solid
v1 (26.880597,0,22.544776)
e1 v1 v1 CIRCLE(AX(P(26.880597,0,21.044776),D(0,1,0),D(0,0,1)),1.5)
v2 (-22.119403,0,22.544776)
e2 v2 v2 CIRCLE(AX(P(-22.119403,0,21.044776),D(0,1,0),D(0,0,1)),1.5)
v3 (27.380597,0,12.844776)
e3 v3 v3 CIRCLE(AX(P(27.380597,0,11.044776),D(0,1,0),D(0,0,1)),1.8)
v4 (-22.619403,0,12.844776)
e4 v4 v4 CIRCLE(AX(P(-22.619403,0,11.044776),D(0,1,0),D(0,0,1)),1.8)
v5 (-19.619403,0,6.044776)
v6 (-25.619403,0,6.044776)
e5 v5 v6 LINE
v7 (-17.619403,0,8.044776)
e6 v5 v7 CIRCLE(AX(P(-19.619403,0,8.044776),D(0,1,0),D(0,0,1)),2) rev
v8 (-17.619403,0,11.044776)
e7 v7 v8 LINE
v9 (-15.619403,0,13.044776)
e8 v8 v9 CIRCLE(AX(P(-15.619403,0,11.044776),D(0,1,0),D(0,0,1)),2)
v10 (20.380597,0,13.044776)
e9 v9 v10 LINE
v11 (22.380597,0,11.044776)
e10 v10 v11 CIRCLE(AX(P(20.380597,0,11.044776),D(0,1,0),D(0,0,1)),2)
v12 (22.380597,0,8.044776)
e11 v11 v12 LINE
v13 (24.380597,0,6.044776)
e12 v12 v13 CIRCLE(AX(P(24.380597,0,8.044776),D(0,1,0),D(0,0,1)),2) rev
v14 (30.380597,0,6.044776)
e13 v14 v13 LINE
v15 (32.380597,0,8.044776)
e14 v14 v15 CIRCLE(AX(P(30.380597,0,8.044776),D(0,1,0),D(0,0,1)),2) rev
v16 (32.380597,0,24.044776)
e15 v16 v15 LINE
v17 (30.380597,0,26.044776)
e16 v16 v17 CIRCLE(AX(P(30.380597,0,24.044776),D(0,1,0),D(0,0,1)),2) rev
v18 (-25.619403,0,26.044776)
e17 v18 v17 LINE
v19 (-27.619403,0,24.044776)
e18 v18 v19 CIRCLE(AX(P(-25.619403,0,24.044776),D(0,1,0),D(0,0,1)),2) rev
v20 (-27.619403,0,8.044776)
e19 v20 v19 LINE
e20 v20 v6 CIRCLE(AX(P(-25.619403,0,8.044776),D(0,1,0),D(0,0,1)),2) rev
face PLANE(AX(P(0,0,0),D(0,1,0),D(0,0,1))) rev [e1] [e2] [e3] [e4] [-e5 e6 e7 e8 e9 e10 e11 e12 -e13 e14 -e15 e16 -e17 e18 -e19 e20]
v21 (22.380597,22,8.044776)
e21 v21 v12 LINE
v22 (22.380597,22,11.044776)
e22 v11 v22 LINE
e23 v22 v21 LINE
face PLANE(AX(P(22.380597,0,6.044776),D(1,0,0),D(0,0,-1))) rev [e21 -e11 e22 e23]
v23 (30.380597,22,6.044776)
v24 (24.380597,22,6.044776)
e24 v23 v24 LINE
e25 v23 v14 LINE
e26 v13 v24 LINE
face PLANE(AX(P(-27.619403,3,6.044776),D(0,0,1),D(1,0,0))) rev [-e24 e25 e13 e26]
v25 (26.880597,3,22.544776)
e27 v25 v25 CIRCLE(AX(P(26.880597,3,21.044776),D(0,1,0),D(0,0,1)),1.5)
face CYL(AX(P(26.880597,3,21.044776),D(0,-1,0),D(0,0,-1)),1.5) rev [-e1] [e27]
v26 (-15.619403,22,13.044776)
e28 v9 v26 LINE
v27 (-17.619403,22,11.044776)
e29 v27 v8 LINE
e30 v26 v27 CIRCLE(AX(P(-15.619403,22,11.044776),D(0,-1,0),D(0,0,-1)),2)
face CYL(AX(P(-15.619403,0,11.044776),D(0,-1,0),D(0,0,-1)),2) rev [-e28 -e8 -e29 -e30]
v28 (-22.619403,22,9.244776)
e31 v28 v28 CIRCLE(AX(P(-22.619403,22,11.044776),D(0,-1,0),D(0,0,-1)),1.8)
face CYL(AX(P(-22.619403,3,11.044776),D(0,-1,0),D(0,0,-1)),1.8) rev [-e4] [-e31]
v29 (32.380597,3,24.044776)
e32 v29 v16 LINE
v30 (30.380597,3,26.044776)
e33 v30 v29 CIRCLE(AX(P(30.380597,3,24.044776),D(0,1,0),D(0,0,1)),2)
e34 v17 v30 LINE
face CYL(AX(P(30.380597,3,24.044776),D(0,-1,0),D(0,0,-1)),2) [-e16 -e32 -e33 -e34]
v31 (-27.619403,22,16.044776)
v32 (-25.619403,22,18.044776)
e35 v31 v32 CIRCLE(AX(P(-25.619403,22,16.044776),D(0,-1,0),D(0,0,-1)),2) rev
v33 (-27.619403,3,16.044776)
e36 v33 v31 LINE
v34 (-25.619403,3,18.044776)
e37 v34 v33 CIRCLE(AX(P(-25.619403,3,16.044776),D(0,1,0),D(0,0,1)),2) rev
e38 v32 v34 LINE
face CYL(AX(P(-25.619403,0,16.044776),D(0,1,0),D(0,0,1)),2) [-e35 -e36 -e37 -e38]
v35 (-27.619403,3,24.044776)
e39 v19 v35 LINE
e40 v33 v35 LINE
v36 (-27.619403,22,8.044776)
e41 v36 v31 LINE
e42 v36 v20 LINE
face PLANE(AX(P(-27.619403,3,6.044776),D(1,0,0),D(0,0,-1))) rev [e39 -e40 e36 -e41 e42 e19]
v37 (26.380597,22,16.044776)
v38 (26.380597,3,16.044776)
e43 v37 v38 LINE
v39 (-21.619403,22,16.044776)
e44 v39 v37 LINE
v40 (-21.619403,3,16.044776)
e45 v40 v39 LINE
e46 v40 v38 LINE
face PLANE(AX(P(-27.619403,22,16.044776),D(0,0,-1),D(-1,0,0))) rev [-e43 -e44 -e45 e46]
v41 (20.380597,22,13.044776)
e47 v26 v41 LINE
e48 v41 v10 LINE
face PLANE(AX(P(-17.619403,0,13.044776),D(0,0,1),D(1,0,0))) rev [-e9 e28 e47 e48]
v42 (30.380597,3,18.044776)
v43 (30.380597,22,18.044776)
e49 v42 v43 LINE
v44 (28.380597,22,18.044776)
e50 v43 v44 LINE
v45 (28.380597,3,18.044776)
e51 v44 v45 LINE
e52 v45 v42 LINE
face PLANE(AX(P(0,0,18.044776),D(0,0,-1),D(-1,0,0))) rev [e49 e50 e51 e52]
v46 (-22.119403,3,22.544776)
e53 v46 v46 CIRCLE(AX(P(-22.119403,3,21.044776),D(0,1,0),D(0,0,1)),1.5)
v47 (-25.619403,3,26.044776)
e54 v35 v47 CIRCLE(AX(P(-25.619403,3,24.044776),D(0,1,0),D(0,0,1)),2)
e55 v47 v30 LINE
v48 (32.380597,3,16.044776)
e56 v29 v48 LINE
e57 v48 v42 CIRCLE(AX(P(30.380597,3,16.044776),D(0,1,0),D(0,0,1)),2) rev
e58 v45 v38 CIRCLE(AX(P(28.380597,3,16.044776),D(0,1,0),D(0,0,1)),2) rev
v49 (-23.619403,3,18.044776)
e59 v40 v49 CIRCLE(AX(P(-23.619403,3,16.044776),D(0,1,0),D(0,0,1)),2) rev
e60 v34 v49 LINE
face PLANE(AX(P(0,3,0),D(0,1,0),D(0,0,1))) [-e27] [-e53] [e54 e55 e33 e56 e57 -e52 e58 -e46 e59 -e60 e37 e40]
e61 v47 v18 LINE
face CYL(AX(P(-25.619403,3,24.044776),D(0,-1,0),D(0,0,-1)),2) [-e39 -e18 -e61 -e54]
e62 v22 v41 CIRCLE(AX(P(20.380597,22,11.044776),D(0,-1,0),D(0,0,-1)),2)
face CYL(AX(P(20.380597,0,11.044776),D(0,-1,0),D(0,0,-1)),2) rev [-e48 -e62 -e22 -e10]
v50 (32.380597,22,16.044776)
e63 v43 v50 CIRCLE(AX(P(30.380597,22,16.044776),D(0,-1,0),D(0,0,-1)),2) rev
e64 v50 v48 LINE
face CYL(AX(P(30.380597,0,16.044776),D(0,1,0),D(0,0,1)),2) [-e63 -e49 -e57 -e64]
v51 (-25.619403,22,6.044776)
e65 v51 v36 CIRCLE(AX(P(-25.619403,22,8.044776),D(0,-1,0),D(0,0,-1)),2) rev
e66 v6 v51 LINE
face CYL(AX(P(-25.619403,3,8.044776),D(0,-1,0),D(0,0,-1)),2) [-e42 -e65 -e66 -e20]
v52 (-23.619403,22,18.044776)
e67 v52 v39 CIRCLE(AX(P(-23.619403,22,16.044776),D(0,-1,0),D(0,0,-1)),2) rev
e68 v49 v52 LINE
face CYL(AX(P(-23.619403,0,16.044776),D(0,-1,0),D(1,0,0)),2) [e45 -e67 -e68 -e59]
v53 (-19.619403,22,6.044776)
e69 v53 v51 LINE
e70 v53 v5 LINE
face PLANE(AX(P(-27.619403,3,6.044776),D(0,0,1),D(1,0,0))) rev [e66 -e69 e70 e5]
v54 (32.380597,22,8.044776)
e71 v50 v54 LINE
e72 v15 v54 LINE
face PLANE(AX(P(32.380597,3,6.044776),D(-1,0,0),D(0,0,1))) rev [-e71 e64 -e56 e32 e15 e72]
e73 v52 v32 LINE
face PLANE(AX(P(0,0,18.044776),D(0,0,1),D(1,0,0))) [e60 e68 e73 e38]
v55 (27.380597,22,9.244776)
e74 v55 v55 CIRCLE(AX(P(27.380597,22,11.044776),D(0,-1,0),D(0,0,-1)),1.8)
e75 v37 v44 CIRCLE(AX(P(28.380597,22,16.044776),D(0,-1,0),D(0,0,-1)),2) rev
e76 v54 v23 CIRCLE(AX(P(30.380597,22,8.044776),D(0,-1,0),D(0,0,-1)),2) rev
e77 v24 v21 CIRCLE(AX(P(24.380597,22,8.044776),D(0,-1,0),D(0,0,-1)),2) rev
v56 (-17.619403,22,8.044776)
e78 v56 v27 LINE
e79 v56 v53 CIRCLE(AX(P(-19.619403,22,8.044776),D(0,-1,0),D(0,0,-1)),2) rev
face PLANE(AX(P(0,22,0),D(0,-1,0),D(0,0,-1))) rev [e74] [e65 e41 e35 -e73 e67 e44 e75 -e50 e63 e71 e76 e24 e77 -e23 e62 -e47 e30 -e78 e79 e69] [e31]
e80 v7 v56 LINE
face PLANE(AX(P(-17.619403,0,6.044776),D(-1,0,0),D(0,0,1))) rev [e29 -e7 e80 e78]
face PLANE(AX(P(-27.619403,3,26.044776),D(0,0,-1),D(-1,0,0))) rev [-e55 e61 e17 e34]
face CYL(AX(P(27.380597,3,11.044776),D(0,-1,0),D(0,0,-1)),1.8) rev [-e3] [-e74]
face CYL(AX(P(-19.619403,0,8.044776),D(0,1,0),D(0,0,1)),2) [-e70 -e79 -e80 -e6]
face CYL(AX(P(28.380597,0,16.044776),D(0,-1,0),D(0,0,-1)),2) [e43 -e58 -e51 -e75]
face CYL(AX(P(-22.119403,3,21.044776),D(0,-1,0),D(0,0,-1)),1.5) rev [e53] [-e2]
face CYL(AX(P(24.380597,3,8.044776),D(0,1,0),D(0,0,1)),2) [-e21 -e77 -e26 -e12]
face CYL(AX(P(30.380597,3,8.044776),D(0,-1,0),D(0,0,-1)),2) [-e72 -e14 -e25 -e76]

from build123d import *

# Parameters (mm, degrees)
SKETCH_1_W          = 60
SKETCH_1_H          = 20
SKETCH_1_R          = 1.5
SKETCH_1_R_2        = 1.8
EXTRUDE_1_DEPTH     = 3
SKETCH_7_W          = 60
SKETCH_7_H          = 10
EXTRUDE_3_DEPTH     = 19
SKETCH_8_R          = 1.8
CUT_EXTRUDE_3_DEPTH = 46.692815914
SKETCH_9_W          = 6
SKETCH_9_H          = 19
EXTRUDE_4_DEPTH     = 2
SKETCH_10_W         = 40
SKETCH_10_H         = 7
CUT_EXTRUDE_4_DEPTH = 48.019500488
FILLET_2_R          = 2


with BuildPart() as part:
    # ｽｹｯﾁ1 → ﾎﾞｽ - 押し出し1 (new body)
    with BuildSketch(Plane(origin=(0, 0, 0), x_dir=(1, 0, 0), z_dir=(0, 1, 0))):
        with Locations((2.380597015, -16.044776119)):
            Rectangle(SKETCH_1_W, SKETCH_1_H)
        with Locations(Location((-22.119402985, -21.044776119, 0), (0, 0, 270))):
            Circle(SKETCH_1_R, mode=Mode.SUBTRACT)
        with Locations(Location((26.880597015, -21.044776119, 0), (0, 0, 270))):
            Circle(SKETCH_1_R, mode=Mode.SUBTRACT)
        with Locations(Location((-22.619402985, -11.044776119, 0), (0, 0, 270))):
            Circle(SKETCH_1_R_2, mode=Mode.SUBTRACT)
        with Locations(Location((27.380597015, -11.044776119, 0), (0, 0, 270))):
            Circle(SKETCH_1_R_2, mode=Mode.SUBTRACT)
    extrude(amount=EXTRUDE_1_DEPTH)

    # ｽｹｯﾁ7 → ﾎﾞｽ - 押し出し3 (add)
    with BuildSketch(Plane(origin=(0, 3, 0), x_dir=(1, 0, 0), z_dir=(0, 1, 0))):
        with Locations((2.380597015, -11.044776119)):
            Rectangle(SKETCH_7_W, SKETCH_7_H)
    extrude(amount=EXTRUDE_3_DEPTH)

    # ｽｹｯﾁ8 → ｶｯﾄ - 押し出し3 (cut, through all)
    with BuildSketch(Plane.XZ.offset(-3)):
        with Locations(Location((27.380597015, 11.044776119, 0), (0, 0, 270))):
            Circle(SKETCH_8_R)
        with Locations(Location((-22.619402985, 11.044776119, 0), (0, 0, 270))):
            Circle(SKETCH_8_R)
    extrude(amount=-CUT_EXTRUDE_3_DEPTH, mode=Mode.SUBTRACT)

    # ｽｹｯﾁ9 → ﾎﾞｽ - 押し出し4 (add)
    with BuildSketch(Plane.XY.offset(16.044776119)):
        with Locations((29.380597015, 12.5)):
            Rectangle(SKETCH_9_W, SKETCH_9_H)
        with Locations((-24.619402985, 12.5)):
            Rectangle(SKETCH_9_W, SKETCH_9_H)
    extrude(amount=EXTRUDE_4_DEPTH)

    # ｽｹｯﾁ10 → ｶｯﾄ - 押し出し4 (cut, through all)
    with BuildSketch(Plane(origin=(0, 22, 0), x_dir=(1, 0, 0), z_dir=(0, 1, 0))):
        with Locations((2.380597015, -9.544776119)):
            Rectangle(SKETCH_10_W, SKETCH_10_H)
    extrude(amount=-CUT_EXTRUDE_4_DEPTH, mode=Mode.SUBTRACT)

    # ﾌｨﾚｯﾄ2
    fillet_2_edges = [part.edges().sort_by_distance(p)[0] for p in [
        (32.380597015, 12.5, 18.044776119),
        (26.380597015, 12.5, 18.044776119),
        (-27.619402985, 12.5, 18.044776119),
        (-21.619402985, 12.5, 18.044776119),
        (32.380597015, 1.5, 26.044776119),
        (-27.619402985, 1.5, 26.044776119),
        (-27.619402985, 11, 6.044776119),
        (32.380597015, 11, 6.044776119),
        (22.380597015, 11, 6.044776119),
        (22.380597015, 11, 13.044776119),
        (-17.619402985, 11, 13.044776119),
        (-17.619402985, 11, 6.044776119),
    ]]
    fillet(fillet_2_edges, radius=FILLET_2_R - 0.0001)  # a hair under: the kernel refuses the full size


solid = part.part
